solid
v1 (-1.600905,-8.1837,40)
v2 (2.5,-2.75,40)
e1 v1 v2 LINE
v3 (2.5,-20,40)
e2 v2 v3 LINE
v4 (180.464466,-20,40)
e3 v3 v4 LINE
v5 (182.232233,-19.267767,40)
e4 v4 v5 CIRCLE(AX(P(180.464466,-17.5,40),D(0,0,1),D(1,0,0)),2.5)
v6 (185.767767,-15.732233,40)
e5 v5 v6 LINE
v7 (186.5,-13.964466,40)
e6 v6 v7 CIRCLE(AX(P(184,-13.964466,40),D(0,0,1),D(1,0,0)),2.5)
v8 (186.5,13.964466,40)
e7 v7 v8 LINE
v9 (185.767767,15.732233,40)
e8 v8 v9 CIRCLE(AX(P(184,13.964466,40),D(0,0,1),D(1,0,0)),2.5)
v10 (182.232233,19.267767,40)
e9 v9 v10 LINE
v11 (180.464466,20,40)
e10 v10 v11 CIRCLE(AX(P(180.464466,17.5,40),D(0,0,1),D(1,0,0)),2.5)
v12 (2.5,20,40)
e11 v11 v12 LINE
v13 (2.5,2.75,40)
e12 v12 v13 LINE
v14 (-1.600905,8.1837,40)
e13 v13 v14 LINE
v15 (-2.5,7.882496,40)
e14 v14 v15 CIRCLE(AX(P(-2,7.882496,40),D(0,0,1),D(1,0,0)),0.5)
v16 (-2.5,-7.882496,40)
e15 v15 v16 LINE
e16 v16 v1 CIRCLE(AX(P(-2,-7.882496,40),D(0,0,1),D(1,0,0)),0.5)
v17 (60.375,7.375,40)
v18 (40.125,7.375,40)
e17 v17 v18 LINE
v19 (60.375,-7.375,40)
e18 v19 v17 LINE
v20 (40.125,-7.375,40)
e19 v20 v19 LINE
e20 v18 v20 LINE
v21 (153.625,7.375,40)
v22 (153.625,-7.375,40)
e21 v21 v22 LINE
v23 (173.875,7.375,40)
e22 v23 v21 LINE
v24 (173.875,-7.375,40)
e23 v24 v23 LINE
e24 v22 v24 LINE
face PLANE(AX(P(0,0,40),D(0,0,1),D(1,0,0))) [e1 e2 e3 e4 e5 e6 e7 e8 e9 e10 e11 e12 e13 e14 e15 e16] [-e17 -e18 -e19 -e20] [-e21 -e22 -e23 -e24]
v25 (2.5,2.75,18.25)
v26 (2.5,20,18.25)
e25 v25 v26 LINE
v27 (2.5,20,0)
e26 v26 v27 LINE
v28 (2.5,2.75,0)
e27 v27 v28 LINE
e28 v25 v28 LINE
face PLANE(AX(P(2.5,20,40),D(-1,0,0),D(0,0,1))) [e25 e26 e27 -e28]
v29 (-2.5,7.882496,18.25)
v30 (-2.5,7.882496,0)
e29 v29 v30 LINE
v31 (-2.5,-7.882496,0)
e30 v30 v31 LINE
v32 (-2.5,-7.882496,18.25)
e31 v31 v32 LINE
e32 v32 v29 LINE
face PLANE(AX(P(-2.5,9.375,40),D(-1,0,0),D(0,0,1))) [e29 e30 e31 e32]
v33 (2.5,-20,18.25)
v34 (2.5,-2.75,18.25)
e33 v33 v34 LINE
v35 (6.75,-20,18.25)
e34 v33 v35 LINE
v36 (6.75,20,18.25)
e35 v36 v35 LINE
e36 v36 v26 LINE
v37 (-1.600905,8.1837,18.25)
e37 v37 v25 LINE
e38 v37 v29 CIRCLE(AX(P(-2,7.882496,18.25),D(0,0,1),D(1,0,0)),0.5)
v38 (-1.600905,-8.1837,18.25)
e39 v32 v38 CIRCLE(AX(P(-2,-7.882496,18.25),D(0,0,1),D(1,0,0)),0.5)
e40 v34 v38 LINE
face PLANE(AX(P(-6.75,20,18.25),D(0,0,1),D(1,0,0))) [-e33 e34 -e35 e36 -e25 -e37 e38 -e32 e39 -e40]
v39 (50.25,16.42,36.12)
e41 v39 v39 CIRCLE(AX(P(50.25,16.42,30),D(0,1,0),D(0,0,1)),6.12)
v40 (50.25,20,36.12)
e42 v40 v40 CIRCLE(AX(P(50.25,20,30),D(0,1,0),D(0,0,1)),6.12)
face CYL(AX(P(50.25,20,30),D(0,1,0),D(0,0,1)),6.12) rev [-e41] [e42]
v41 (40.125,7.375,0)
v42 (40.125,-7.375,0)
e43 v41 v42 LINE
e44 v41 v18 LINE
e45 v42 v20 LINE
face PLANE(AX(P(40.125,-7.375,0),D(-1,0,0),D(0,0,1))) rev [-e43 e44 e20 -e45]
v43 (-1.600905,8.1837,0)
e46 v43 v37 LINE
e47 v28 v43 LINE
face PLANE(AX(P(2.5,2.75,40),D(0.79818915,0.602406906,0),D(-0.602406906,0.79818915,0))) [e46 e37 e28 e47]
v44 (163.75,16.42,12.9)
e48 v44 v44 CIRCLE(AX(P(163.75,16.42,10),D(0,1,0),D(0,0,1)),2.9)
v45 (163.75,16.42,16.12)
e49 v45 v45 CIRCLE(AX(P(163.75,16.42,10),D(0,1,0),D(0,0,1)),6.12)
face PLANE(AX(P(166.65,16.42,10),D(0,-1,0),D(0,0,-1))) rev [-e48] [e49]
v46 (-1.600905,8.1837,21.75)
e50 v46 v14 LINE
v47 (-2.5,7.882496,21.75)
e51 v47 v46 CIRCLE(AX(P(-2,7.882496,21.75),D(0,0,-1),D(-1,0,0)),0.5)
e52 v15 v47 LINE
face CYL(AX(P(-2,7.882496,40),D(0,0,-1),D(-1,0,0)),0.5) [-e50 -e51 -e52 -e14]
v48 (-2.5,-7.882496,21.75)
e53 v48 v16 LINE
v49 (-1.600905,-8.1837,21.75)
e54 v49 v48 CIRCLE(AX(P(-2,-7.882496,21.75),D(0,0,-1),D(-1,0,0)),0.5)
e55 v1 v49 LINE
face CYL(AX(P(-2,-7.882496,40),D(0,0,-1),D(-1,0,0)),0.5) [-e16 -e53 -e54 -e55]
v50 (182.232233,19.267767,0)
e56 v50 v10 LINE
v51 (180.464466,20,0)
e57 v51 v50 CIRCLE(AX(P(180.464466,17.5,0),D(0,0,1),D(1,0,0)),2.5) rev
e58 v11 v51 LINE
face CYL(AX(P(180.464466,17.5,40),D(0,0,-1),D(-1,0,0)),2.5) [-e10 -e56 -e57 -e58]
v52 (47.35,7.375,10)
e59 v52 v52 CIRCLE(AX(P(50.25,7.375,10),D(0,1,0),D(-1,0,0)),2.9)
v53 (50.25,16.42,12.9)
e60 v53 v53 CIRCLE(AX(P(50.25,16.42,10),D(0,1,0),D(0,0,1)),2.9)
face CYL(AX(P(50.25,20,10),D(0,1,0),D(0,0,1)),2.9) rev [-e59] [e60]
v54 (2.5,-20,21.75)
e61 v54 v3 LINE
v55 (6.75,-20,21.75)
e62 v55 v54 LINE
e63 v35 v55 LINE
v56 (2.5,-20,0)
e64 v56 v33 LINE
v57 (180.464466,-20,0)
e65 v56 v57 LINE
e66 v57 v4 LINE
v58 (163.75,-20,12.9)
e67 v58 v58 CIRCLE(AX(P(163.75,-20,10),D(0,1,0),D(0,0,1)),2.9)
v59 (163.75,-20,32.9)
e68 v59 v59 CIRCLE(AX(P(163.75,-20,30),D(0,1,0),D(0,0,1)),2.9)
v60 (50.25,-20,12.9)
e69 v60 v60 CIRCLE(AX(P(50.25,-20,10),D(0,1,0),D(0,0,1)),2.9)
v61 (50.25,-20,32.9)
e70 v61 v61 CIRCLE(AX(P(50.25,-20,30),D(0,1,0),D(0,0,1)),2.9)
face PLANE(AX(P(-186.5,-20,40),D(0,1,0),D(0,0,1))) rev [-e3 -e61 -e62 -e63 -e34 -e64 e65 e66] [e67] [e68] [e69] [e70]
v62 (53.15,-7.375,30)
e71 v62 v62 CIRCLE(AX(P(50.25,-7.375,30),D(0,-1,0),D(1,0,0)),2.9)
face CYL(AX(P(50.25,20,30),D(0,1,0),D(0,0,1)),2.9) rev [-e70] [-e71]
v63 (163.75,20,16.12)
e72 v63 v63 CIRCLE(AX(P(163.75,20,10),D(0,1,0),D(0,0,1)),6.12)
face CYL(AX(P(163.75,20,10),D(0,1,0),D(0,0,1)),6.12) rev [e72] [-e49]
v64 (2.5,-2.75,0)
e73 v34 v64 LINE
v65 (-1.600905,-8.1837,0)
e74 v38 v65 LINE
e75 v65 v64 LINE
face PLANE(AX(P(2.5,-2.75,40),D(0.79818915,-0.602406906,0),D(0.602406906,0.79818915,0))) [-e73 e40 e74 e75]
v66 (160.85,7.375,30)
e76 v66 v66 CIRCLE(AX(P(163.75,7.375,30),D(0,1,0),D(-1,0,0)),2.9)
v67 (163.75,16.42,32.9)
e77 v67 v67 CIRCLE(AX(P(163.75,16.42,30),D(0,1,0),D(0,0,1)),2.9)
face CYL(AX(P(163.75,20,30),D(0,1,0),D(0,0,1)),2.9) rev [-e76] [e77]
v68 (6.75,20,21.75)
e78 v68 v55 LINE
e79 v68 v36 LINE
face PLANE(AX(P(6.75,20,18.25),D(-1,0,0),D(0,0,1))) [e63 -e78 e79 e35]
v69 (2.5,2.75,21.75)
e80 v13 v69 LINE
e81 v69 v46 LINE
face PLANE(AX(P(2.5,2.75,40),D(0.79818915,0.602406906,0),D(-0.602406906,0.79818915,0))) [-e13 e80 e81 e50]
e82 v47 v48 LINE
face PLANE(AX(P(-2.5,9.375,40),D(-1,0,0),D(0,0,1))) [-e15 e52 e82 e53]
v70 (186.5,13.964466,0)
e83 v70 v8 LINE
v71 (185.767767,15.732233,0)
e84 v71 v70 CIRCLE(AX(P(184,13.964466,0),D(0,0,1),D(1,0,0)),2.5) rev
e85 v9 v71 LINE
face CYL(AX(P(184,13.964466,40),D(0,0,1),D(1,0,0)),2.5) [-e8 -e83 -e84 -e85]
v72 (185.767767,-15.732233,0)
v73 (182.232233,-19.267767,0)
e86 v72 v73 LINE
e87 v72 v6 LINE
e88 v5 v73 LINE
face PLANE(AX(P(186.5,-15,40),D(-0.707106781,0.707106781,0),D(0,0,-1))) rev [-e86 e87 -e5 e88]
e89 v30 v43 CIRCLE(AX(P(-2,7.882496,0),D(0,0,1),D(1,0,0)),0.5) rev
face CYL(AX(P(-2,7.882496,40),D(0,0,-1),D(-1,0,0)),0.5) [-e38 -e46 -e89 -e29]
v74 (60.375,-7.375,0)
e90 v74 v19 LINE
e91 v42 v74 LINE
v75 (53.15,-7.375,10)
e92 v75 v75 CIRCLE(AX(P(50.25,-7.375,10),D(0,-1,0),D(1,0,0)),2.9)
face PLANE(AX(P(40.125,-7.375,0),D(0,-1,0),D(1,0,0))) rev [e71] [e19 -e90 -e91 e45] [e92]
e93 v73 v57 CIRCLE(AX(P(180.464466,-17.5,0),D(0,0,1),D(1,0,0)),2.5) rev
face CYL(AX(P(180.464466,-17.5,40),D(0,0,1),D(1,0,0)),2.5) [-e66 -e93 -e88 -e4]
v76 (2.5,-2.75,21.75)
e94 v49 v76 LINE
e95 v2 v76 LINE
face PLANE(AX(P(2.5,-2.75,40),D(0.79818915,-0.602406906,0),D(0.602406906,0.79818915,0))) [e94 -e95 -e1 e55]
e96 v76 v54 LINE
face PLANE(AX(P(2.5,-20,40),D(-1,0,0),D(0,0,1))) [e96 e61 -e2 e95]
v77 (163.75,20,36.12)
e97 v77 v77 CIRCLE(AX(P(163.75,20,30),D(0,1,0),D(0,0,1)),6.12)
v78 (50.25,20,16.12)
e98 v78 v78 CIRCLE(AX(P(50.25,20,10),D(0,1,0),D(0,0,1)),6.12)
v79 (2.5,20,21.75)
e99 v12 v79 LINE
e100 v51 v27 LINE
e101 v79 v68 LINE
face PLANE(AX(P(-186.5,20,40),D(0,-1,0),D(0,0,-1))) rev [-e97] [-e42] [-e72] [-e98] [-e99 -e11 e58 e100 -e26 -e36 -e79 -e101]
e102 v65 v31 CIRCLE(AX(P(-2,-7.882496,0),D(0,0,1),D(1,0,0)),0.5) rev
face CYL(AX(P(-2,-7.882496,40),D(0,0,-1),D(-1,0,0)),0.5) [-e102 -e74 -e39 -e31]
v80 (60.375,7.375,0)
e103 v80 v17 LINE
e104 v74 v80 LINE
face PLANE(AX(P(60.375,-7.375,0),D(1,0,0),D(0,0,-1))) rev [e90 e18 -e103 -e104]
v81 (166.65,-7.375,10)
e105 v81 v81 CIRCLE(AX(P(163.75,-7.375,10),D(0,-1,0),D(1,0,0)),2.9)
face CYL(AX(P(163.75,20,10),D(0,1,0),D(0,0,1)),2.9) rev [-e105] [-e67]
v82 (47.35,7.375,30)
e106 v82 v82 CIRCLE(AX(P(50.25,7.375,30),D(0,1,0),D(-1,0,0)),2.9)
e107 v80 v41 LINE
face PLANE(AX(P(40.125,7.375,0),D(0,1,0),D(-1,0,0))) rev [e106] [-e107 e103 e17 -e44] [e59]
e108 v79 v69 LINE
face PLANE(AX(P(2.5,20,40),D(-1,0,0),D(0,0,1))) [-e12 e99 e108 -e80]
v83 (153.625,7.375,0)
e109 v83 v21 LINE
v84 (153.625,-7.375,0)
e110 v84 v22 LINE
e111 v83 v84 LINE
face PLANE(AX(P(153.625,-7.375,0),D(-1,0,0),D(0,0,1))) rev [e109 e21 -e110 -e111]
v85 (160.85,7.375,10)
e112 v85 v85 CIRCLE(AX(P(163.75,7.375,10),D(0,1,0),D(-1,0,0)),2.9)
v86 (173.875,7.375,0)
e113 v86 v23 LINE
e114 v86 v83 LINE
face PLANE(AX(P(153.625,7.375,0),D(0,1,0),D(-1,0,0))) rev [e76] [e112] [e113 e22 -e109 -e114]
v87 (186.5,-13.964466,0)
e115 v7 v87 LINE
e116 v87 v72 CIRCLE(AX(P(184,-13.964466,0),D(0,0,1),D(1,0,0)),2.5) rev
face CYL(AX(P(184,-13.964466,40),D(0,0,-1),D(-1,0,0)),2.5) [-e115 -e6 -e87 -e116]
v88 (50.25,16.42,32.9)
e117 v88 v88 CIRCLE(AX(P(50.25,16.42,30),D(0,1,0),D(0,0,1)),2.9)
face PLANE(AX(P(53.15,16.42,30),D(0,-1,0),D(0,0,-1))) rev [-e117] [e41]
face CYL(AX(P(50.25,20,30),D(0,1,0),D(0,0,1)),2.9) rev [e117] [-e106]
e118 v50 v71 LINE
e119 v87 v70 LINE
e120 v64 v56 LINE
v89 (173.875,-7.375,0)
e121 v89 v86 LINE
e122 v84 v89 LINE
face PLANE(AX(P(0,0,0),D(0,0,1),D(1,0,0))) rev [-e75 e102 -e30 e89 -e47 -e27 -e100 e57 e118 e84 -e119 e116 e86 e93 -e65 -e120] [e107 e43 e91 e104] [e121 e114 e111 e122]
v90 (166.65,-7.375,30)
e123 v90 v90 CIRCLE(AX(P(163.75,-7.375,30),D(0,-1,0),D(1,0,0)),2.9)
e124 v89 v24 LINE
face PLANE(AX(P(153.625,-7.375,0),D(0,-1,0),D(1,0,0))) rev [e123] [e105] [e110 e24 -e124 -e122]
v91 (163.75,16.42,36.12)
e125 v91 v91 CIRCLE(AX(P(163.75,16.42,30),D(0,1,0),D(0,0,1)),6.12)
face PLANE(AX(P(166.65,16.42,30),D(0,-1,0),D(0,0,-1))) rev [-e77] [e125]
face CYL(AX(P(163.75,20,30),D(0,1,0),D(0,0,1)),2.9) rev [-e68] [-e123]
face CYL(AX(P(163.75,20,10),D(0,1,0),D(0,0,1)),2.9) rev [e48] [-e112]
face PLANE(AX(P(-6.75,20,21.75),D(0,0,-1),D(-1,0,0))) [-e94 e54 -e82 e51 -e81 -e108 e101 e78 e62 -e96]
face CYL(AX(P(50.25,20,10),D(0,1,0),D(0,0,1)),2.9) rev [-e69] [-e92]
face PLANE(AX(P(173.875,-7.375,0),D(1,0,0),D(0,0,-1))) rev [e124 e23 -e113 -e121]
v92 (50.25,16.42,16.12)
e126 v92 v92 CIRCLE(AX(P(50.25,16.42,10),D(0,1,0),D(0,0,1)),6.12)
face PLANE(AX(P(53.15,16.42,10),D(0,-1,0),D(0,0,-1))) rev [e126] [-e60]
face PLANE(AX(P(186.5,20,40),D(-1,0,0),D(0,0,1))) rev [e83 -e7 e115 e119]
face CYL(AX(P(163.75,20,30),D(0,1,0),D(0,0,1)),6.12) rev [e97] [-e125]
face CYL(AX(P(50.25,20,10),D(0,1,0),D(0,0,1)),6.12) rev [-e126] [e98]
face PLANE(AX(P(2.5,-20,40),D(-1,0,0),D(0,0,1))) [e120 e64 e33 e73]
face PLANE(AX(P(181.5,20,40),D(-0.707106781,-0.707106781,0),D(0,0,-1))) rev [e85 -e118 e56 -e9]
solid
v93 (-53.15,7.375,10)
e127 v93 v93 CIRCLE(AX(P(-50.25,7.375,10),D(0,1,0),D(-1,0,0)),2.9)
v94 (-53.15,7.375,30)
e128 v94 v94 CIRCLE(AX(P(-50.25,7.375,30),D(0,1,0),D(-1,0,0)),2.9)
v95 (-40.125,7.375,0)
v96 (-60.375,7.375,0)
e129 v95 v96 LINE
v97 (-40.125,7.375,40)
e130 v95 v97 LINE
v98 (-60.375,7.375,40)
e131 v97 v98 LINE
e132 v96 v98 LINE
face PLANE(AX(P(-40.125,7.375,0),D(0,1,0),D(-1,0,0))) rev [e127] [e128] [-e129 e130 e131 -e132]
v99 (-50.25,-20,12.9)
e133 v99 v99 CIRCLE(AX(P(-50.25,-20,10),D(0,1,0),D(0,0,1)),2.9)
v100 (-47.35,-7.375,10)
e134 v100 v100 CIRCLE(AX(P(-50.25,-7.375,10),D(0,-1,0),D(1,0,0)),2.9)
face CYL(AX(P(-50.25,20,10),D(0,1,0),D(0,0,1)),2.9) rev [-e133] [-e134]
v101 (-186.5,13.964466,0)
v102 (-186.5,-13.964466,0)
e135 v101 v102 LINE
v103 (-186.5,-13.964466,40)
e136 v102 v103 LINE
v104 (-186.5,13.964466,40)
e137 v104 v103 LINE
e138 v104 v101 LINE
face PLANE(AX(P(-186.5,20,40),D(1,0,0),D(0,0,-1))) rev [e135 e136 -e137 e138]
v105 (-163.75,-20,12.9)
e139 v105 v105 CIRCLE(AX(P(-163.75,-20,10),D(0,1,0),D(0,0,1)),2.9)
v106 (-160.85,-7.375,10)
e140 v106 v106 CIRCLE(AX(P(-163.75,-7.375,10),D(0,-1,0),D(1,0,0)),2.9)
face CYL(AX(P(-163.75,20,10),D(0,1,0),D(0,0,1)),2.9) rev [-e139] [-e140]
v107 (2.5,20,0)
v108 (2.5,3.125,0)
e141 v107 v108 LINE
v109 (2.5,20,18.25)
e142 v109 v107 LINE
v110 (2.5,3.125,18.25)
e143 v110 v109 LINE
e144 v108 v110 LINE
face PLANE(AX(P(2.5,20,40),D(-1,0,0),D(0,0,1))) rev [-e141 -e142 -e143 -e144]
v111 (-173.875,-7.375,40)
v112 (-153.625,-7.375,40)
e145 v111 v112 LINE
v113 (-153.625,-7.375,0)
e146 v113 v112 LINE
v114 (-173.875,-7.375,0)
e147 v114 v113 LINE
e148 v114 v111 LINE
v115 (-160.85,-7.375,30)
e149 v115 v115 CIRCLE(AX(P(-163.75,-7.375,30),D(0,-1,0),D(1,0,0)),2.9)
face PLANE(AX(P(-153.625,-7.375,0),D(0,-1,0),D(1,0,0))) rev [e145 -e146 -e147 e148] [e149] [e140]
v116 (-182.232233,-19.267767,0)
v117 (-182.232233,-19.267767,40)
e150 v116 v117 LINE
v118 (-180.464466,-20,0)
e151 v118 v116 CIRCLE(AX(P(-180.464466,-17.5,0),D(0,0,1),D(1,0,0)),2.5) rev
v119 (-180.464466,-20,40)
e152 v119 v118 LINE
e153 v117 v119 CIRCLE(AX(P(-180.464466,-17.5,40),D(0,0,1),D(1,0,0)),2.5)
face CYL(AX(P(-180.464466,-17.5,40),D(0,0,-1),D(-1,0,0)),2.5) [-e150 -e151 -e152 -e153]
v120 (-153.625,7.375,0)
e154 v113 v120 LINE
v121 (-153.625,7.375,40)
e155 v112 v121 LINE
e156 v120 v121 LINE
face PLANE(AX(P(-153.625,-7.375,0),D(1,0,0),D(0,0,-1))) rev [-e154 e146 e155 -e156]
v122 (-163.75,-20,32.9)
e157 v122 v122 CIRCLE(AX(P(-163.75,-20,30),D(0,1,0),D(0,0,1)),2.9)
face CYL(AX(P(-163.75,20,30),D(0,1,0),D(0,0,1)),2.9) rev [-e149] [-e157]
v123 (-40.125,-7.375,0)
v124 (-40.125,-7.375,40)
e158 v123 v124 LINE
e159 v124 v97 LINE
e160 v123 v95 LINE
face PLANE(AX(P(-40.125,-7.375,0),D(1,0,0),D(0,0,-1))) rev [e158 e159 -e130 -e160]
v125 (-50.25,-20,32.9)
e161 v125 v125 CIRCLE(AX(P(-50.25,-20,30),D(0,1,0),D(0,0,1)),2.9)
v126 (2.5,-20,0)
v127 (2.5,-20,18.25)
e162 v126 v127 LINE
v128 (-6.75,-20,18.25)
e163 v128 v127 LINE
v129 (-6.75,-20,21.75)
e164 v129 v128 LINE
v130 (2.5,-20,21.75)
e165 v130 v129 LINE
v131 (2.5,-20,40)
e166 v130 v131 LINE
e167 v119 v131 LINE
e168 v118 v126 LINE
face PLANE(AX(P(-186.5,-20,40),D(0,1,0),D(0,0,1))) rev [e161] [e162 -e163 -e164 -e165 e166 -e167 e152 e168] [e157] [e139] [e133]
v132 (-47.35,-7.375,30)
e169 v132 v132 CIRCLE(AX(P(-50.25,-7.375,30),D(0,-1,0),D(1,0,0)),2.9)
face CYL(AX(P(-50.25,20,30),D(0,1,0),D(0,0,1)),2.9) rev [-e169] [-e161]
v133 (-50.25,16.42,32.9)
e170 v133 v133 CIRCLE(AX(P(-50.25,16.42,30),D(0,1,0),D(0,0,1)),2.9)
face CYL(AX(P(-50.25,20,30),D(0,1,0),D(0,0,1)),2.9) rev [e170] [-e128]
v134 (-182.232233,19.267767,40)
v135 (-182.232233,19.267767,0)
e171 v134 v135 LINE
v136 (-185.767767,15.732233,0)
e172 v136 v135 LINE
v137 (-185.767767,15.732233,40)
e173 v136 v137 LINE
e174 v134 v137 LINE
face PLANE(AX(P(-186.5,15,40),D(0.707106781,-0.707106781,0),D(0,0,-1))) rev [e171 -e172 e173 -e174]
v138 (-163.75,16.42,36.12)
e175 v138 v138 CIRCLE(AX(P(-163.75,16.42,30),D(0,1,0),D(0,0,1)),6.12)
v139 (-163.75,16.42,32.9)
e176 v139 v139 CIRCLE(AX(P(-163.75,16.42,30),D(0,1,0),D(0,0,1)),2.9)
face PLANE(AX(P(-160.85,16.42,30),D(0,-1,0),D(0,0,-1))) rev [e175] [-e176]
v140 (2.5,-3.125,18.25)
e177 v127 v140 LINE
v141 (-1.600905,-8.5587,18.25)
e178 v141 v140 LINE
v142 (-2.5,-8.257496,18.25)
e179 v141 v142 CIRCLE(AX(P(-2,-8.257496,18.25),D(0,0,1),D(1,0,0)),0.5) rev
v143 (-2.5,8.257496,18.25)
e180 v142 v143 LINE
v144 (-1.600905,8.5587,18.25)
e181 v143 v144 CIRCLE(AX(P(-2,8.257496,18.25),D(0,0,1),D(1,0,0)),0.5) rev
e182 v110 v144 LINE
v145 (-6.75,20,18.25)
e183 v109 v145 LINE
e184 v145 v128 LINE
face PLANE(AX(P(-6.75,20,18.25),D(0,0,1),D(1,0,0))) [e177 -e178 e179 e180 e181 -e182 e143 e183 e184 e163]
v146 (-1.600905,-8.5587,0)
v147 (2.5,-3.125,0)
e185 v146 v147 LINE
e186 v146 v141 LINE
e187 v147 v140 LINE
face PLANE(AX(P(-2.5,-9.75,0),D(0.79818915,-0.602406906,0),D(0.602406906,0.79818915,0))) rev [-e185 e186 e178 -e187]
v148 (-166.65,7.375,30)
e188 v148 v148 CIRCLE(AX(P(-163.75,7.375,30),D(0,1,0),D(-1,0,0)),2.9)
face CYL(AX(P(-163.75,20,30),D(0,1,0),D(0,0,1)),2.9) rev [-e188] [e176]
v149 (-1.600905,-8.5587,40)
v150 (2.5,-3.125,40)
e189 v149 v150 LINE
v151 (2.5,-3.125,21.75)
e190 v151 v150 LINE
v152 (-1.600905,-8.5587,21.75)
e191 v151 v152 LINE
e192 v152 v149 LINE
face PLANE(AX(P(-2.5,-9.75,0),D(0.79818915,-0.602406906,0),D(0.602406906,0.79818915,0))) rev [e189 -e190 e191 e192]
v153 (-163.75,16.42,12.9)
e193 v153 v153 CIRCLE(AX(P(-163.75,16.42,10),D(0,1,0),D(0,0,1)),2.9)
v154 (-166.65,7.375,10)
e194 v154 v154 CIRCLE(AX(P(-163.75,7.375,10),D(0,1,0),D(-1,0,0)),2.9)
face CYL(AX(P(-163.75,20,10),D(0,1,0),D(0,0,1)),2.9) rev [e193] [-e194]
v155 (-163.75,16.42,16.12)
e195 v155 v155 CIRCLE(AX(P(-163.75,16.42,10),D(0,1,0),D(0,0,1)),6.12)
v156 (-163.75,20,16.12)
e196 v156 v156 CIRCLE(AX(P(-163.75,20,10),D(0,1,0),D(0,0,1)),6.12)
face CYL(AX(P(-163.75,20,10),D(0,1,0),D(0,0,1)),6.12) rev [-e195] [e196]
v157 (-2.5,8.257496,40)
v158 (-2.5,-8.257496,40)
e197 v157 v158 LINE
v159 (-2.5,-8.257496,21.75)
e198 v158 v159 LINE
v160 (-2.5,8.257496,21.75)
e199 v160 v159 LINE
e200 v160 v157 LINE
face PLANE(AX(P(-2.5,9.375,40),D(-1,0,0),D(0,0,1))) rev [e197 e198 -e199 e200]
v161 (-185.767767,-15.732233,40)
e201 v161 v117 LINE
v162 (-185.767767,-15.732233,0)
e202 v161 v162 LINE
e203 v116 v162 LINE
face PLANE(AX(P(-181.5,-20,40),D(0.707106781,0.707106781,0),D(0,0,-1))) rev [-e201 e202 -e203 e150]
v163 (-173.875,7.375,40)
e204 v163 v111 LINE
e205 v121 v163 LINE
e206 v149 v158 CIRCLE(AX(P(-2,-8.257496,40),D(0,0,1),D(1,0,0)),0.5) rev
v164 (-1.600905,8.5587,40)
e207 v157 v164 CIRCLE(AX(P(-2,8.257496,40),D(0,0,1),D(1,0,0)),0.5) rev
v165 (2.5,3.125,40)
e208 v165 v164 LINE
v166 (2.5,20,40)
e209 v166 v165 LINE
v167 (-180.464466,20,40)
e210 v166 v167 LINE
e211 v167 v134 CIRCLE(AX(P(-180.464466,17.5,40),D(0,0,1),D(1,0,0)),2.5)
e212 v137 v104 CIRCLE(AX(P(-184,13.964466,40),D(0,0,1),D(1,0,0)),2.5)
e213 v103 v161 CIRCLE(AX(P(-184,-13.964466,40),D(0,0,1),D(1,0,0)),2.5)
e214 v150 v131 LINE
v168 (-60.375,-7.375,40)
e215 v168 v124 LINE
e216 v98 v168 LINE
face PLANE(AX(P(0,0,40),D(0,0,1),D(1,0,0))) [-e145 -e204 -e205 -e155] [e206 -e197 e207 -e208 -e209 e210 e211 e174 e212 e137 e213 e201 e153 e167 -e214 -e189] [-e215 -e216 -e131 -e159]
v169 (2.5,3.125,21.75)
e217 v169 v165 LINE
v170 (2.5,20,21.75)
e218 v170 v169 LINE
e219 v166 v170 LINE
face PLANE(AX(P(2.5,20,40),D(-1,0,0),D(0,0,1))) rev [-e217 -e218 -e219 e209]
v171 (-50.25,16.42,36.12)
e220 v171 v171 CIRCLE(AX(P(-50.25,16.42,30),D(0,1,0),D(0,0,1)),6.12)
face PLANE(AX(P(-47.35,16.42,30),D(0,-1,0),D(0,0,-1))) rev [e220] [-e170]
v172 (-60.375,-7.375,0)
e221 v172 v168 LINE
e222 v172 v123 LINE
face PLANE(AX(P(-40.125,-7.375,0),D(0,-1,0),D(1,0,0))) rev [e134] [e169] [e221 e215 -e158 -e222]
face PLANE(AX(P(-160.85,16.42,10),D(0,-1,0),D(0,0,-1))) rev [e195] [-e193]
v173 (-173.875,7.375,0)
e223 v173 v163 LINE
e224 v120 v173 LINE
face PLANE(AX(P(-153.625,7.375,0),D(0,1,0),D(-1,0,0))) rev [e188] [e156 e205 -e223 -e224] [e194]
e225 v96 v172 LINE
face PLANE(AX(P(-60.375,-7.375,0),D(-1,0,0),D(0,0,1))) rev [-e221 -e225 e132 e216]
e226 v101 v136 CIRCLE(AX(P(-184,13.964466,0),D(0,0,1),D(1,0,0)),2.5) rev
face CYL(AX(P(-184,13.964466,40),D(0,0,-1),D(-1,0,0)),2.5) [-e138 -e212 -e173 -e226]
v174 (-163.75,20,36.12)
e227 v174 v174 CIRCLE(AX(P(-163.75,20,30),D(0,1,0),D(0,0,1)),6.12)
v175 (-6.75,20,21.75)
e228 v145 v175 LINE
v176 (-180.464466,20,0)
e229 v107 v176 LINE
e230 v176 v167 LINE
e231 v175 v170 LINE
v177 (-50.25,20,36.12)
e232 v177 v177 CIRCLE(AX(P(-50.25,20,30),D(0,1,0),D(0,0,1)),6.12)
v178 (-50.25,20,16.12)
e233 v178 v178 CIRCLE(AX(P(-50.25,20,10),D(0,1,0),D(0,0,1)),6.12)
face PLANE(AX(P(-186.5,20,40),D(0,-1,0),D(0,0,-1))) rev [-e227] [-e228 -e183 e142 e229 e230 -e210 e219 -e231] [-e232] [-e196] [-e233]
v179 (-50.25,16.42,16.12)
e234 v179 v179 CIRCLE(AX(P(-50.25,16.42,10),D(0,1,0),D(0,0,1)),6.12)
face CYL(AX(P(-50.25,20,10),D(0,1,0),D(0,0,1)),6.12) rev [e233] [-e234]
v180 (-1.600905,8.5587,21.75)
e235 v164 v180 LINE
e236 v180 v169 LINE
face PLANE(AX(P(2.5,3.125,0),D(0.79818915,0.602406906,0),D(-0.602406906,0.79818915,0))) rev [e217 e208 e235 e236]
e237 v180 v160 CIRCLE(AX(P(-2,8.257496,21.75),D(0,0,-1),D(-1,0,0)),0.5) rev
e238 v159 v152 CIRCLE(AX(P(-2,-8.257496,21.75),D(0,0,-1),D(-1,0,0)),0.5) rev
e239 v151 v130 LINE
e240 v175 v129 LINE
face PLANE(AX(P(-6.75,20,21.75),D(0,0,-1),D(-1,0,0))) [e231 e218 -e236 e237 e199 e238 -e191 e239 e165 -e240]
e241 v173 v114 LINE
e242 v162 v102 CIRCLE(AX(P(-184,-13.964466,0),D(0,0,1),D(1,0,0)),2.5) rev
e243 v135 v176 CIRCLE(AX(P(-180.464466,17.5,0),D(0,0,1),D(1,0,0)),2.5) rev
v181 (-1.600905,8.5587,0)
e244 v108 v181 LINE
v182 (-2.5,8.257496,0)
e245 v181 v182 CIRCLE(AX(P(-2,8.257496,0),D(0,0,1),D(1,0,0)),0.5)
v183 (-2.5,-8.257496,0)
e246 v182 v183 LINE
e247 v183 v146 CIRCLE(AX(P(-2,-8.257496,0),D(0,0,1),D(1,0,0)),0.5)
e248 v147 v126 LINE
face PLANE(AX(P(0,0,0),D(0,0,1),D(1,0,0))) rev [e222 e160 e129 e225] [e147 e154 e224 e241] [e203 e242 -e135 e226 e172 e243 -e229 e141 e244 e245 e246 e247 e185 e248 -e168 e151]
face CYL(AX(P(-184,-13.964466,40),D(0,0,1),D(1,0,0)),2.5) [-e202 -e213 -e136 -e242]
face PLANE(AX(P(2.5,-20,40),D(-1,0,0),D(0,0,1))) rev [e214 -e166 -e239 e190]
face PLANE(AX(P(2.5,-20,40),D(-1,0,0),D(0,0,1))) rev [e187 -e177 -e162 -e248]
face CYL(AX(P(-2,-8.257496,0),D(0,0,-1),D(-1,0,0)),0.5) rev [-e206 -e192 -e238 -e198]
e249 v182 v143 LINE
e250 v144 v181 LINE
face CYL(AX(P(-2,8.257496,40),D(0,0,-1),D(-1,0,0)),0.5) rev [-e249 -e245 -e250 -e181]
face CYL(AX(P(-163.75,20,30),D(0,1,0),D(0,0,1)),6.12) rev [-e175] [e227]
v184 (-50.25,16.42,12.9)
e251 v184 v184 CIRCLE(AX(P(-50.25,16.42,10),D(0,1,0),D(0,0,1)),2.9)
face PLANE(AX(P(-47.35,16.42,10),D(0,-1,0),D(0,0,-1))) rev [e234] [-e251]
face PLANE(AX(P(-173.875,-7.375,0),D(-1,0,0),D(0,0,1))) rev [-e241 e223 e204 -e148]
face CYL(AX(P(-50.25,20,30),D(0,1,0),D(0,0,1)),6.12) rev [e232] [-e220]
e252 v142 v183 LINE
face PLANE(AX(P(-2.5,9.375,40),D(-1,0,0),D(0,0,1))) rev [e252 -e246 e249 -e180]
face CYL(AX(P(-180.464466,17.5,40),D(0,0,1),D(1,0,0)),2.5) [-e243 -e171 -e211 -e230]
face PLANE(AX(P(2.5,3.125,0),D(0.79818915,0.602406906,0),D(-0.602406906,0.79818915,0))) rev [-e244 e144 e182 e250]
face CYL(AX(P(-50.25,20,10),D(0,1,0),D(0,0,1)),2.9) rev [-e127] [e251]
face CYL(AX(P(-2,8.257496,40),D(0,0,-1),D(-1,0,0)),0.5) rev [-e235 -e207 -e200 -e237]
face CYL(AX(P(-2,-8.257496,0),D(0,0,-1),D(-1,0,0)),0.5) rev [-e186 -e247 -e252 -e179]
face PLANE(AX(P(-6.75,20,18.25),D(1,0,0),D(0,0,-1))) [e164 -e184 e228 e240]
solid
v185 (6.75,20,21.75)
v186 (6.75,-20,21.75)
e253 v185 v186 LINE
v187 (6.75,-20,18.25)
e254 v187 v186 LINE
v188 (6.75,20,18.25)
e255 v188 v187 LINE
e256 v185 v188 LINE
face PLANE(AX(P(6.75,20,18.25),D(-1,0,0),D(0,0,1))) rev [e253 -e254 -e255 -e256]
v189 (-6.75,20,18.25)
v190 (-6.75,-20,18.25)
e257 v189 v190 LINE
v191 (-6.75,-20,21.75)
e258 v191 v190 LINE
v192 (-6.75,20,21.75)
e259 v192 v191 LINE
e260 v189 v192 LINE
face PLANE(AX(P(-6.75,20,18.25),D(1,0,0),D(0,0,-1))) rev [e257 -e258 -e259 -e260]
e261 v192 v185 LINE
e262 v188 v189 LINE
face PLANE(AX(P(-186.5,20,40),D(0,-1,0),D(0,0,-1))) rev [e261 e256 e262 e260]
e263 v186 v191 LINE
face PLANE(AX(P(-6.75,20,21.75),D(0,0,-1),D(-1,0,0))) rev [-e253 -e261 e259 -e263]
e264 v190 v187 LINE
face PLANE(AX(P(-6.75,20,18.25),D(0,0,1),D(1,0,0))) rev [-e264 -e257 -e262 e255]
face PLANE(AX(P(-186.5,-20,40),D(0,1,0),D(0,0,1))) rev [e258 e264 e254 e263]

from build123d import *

# Parameters (mm, degrees)
SKETCH2_W                               = 373
SKETCH2_H                               = 40
BOSS_EXTRUDE1_DEPTH                     = 40
SKETCH3_W                               = 20.25
SKETCH3_H                               = 14.75
CUT_EXTRUDE1_DEPTH                      = 192.786991217
CHAMFER1_SIZE                           = 5
FILLET1_R                               = 2.5
CBORE_FOR_M5_HEX_HEAD_BOLT1_D           = 5.8
CBORE_FOR_M5_HEX_HEAD_BOLT1_CBORE_D     = 12.24
CBORE_FOR_M5_HEX_HEAD_BOLT1_CBORE_DEPTH = 3.58
LPATTERN1_COUNT                         = 2
LPATTERN1_PITCH                         = 113.5
MIRROR1_COPY_1_D                        = 5.8
MIRROR1_COPY_1_CBORE_D                  = 12.24
MIRROR1_COPY_1_CBORE_DEPTH              = 3.58
MIRROR2_COPY_1_D                        = 5.8
MIRROR2_COPY_1_CBORE_D                  = 12.24
MIRROR2_COPY_1_CBORE_DEPTH              = 3.58
MIRROR2_COPY_2_D                        = 5.8
MIRROR2_COPY_2_CBORE_D                  = 12.24
MIRROR2_COPY_2_CBORE_DEPTH              = 3.58
MIRROR2_COPY_3_D                        = 5.8
MIRROR2_COPY_3_CBORE_D                  = 12.24
MIRROR2_COPY_3_CBORE_DEPTH              = 3.58
SPLIT1_OUTLINE_W                        = 20.25
SPLIT1_OUTLINE_H                        = 14.75
SPLIT1_DEPTH                            = 40
SPLIT1_START                            = 18.25
SPLIT1_2_DEPTH                          = 3.5
SPLIT1_START_2                          = -20
SPLIT1_3_OUTLINE_W                      = 93.25
SPLIT1_3_OUTLINE_H                      = 40
SPLIT1_3_OUTLINE_W_2                    = 12.625
SPLIT1_3_DEPTH                          = 40
SPLIT1_4_OUTLINE_W                      = 5
SPLIT1_4_OUTLINE_H                      = 18.25
SPLIT1_4_OUTLINE_W_2                    = 20.25
SPLIT1_4_OUTLINE_H_2                    = 40
SPLIT1_4_OUTLINE_R                      = 2.9
SPLIT1_4_DEPTH                          = 12.625
SPLIT1_START_3                          = 7.375
SPLIT1_5_OUTLINE_W                      = 5
SPLIT1_5_OUTLINE_H                      = 18.25
SPLIT1_5_OUTLINE_W_2                    = 20.25
SPLIT1_5_OUTLINE_H_2                    = 40
SPLIT1_5_OUTLINE_R                      = 6.12
SPLIT1_5_DEPTH                          = 12.625
SPLIT1_6_OUTLINE_R                      = 6.12
SPLIT1_6_OUTLINE_R_2                    = 2.9
SPLIT1_6_DEPTH                          = 9.045
SPLIT1_START_4                          = -7.375
SPLIT1_7_OUTLINE_W                      = 5
SPLIT1_7_OUTLINE_H                      = 18.25
SPLIT1_7_DEPTH                          = 4.625
SPLIT1_START_5                          = 2.75
SPLIT1_8_OUTLINE_W                      = 5
SPLIT1_8_OUTLINE_H                      = 18.25
SPLIT1_8_DEPTH                          = 4.625
SPLIT1_START_6                          = -1
SPLIT1_9_DEPTH                          = 42
SPLIT1_10_DEPTH                         = 3.5
SPLIT1_11_DEPTH                         = 3.5
CUT_EXTRUDE3_DEPTH                      = 192.786991217
FILLET2_R                               = 0.5
FILLET3_R                               = 0.5


with BuildPart() as part:
    # Sketch2 → Boss-Extrude1 (new body)
    with BuildSketch(Plane.XY):
        Rectangle(SKETCH2_W, SKETCH2_H)
    extrude(amount=BOSS_EXTRUDE1_DEPTH)

    # Sketch3 → Cut-Extrude1 (cut, through all)
    with BuildSketch(Plane.XY.offset(40)):
        with Locations((-163.75, 0)):
            Rectangle(SKETCH3_W, SKETCH3_H)
        with Locations((-50.25, 0)):
            Rectangle(SKETCH3_W, SKETCH3_H)
        with Locations((50.25, 0)):
            Rectangle(SKETCH3_W, SKETCH3_H)
        with Locations((163.75, 0)):
            Rectangle(SKETCH3_W, SKETCH3_H)
    extrude(amount=-CUT_EXTRUDE1_DEPTH, mode=Mode.SUBTRACT)

    # Chamfer1
    chamfer1_edges = [part.edges().sort_by_distance(p)[0] for p in [
        (186.5, -20, 20),
        (-186.5, -20, 20),
        (-186.5, 20, 20),
        (186.5, 20, 20),
    ]]
    chamfer(chamfer1_edges, length=CHAMFER1_SIZE)

    # Fillet1
    fillet1_edges = [part.edges().sort_by_distance(p)[0] for p in [
        (-181.5, 20, 20),
        (181.5, 20, 20),
        (186.5, -15, 20),
        (186.5, 15, 20),
        (-181.5, -20, 20),
        (181.5, -20, 20),
        (-186.5, 15, 20),
        (-186.5, -15, 20),
    ]]
    fillet(fillet1_edges, radius=FILLET1_R)

    # CBORE for M5 Hex Head Bolt1 (through all)
    with Locations(Plane(origin=(0, 20, 0), x_dir=(1, 0, 0), z_dir=(0, 1, 0))):
        with Locations((-163.75, -10)):
            cbore_for_m5_hex_head_bolt1 = CounterBoreHole(CBORE_FOR_M5_HEX_HEAD_BOLT1_D / 2, CBORE_FOR_M5_HEX_HEAD_BOLT1_CBORE_D / 2, CBORE_FOR_M5_HEX_HEAD_BOLT1_CBORE_DEPTH)

    # LPattern1: CBORE for M5 Hex Head Bolt1 ×2
    with Locations(*[(i * LPATTERN1_PITCH, 0, 0) for i in range(1, LPATTERN1_COUNT)]):
        add(cbore_for_m5_hex_head_bolt1, mode=Mode.SUBTRACT)

    # Mirror1: CBORE for M5 Hex Head Bolt1 across plane
    add(cbore_for_m5_hex_head_bolt1.mirror(Plane(origin=(0, 0, 0), x_dir=(0, 0, 1), z_dir=(1, 0, 0))), mode=Mode.SUBTRACT)

    # Mirror1 copy 1 (through all)
    with Locations(Plane(origin=(-113.5, 20, 0), x_dir=(-1, 0, 0), z_dir=(0, 1, 0))):
        with Locations((-163.75, 10)):
            CounterBoreHole(MIRROR1_COPY_1_D / 2, MIRROR1_COPY_1_CBORE_D / 2, MIRROR1_COPY_1_CBORE_DEPTH)

    # Mirror2: CBORE for M5 Hex Head Bolt1 across plane
    add(cbore_for_m5_hex_head_bolt1.mirror(Plane.XY.offset(20)), mode=Mode.SUBTRACT)

    # Mirror2 copy 1 (through all)
    with Locations(Plane(origin=(113.5, 20, 40), x_dir=(1, 0, 0), z_dir=(0, 1, 0))):
        with Locations((-163.75, 10)):
            CounterBoreHole(MIRROR2_COPY_1_D / 2, MIRROR2_COPY_1_CBORE_D / 2, MIRROR2_COPY_1_CBORE_DEPTH)

    # Mirror2 copy 2 (through all)
    with Locations(Plane(origin=(0, 20, 40), x_dir=(-1, 0, 0), z_dir=(0, 1, 0))):
        with Locations((-163.75, -10)):
            CounterBoreHole(MIRROR2_COPY_2_D / 2, MIRROR2_COPY_2_CBORE_D / 2, MIRROR2_COPY_2_CBORE_DEPTH)

    # Mirror2 copy 3 (through all)
    with Locations(Plane(origin=(-113.5, 20, 40), x_dir=(-1, 0, 0), z_dir=(0, 1, 0))):
        with Locations((-163.75, -10)):
            CounterBoreHole(MIRROR2_COPY_3_D / 2, MIRROR2_COPY_3_CBORE_D / 2, MIRROR2_COPY_3_CBORE_DEPTH)

    # Split1: read off the stored shape, not the designer's step
    # Split1 outline → Split1 (cut)
    with BuildSketch(Plane.XY):
        with BuildLine():
            Line((2.5, -20), (2.5, -2.75))
            Line((2.5, -2.75), (-2.5, -9.375))
            Line((-2.5, -9.375), (-2.5, 9.375))
            Line((-2.5, 9.375), (2.5, 2.75))
            Line((2.5, 2.75), (2.5, 20))
            Line((2.5, 20), (-180.464466094, 20))
            ThreePointArc((-180.464466094, 20), (-181.421174675, 19.809698831), (-182.232233047, 19.267766953))
            Line((-182.232233047, 19.267766953), (-185.767766953, 15.732233047))
            ThreePointArc((-185.767766953, 15.732233047), (-186.309698831, 14.921174675), (-186.5, 13.964466094))
            Line((-186.5, 13.964466094), (-186.5, -13.964466094))
            ThreePointArc((-186.5, -13.964466094), (-186.309698831, -14.921174675), (-185.767766953, -15.732233047))
            Line((-185.767766953, -15.732233047), (-182.232233047, -19.267766953))
            ThreePointArc((-182.232233047, -19.267766953), (-181.421174675, -19.809698831), (-180.464466094, -20))
            Line((-180.464466094, -20), (2.5, -20))
        make_face()
        with Locations((-163.75, 0)):
            Rectangle(SPLIT1_OUTLINE_W, SPLIT1_OUTLINE_H, mode=Mode.SUBTRACT)
        with Locations((-50.25, 0)):
            Rectangle(SPLIT1_OUTLINE_W, SPLIT1_OUTLINE_H, mode=Mode.SUBTRACT)
    extrude(amount=SPLIT1_DEPTH, mode=Mode.SUBTRACT)

    # Split1 2 outline → Split1 2 (cut)
    with BuildSketch(Plane.XY.offset(SPLIT1_START)):
        Polygon((-2.5, -9.375), (2.5, -2.75), (2.5, -20), (6.75, -20), (6.75, 20), (2.5, 20), (2.5, 2.75), (-2.5, 9.375), align=None)
    extrude(amount=SPLIT1_2_DEPTH, mode=Mode.SUBTRACT)

    # Fillet2
    fillet2_edges = [part.edges().sort_by_distance(p)[0] for p in [
        (-2.5, -9.375, 9.125),
        (-2.5, -9.375, 30.875),
        (-2.5, 9.375, 9.125),
        (-2.5, 9.375, 30.875),
    ]]
    fillet(fillet2_edges, radius=FILLET2_R)


with BuildPart() as body_2:
    # Split1 3 outline → Split1 3 (new body)
    with BuildSketch(Plane(origin=(0, 0, 0), x_dir=(1, 0, 0), z_dir=(0, 1, 0)).offset(SPLIT1_START_2)):
        Polygon((-2.5, -40), (-2.5, -21.75), (-6.75, -21.75), (-6.75, -18.25), (-2.5, -18.25), (-2.5, 0), (-40.125, 0), (-40.125, -40), align=None)
        with Locations((-107, -20)):
            Rectangle(SPLIT1_3_OUTLINE_W, SPLIT1_3_OUTLINE_H)
        with Locations((-180.1875, -20)):
            Rectangle(SPLIT1_3_OUTLINE_W_2, SPLIT1_3_OUTLINE_H)
    extrude(amount=SPLIT1_3_DEPTH)

    # Split1 4 outline → Split1 4 (add)
    # profile 1 of 4: a face of its own
    with BuildSketch(Plane(origin=(0, 0, 0), x_dir=(1, 0, 0), z_dir=(0, 1, 0)).offset(SPLIT1_START_2)):
        with Locations((0, -30.875)):
            Rectangle(SPLIT1_4_OUTLINE_W, SPLIT1_4_OUTLINE_H)
    # profile 2 of 4: a face of its own
    with BuildSketch(Plane(origin=(0, 0, 0), x_dir=(1, 0, 0), z_dir=(0, 1, 0)).offset(SPLIT1_START_2)):
        with Locations((-50.25, -20)):
            Rectangle(SPLIT1_4_OUTLINE_W_2, SPLIT1_4_OUTLINE_H_2)
        with Locations((-50.25, -30)):
            Circle(SPLIT1_4_OUTLINE_R, mode=Mode.SUBTRACT)
        with Locations((-50.25, -10)):
            Circle(SPLIT1_4_OUTLINE_R, mode=Mode.SUBTRACT)
    # profile 3 of 4: a face of its own
    with BuildSketch(Plane(origin=(0, 0, 0), x_dir=(1, 0, 0), z_dir=(0, 1, 0)).offset(SPLIT1_START_2)):
        with Locations((0, -9.125)):
            Rectangle(SPLIT1_4_OUTLINE_W, SPLIT1_4_OUTLINE_H)
    # profile 4 of 4: a face of its own
    with BuildSketch(Plane(origin=(0, 0, 0), x_dir=(1, 0, 0), z_dir=(0, 1, 0)).offset(SPLIT1_START_2)):
        with Locations((-163.75, -20)):
            Rectangle(SPLIT1_4_OUTLINE_W_2, SPLIT1_4_OUTLINE_H_2)
        with Locations((-163.75, -30)):
            Circle(SPLIT1_4_OUTLINE_R, mode=Mode.SUBTRACT)
        with Locations((-163.75, -10)):
            Circle(SPLIT1_4_OUTLINE_R, mode=Mode.SUBTRACT)
    extrude(amount=SPLIT1_4_DEPTH)

    # Split1 5 outline → Split1 5 (add)
    # profile 1 of 4: a face of its own
    with BuildSketch(Plane(origin=(0, 0, 0), x_dir=(1, 0, 0), z_dir=(0, 1, 0)).offset(SPLIT1_START_3)):
        with Locations((0, -30.875)):
            Rectangle(SPLIT1_5_OUTLINE_W, SPLIT1_5_OUTLINE_H)
    # profile 2 of 4: a face of its own
    with BuildSketch(Plane(origin=(0, 0, 0), x_dir=(1, 0, 0), z_dir=(0, 1, 0)).offset(SPLIT1_START_3)):
        with Locations((-50.25, -20)):
            Rectangle(SPLIT1_5_OUTLINE_W_2, SPLIT1_5_OUTLINE_H_2)
        with Locations((-50.25, -30)):
            Circle(SPLIT1_5_OUTLINE_R, mode=Mode.SUBTRACT)
        with Locations((-50.25, -10)):
            Circle(SPLIT1_5_OUTLINE_R, mode=Mode.SUBTRACT)
    # profile 3 of 4: a face of its own
    with BuildSketch(Plane(origin=(0, 0, 0), x_dir=(1, 0, 0), z_dir=(0, 1, 0)).offset(SPLIT1_START_3)):
        with Locations((0, -9.125)):
            Rectangle(SPLIT1_5_OUTLINE_W, SPLIT1_5_OUTLINE_H)
    # profile 4 of 4: a face of its own
    with BuildSketch(Plane(origin=(0, 0, 0), x_dir=(1, 0, 0), z_dir=(0, 1, 0)).offset(SPLIT1_START_3)):
        with Locations((-163.75, -20)):
            Rectangle(SPLIT1_5_OUTLINE_W_2, SPLIT1_5_OUTLINE_H_2)
        with Locations((-163.75, -30)):
            Circle(SPLIT1_5_OUTLINE_R, mode=Mode.SUBTRACT)
        with Locations((-163.75, -10)):
            Circle(SPLIT1_5_OUTLINE_R, mode=Mode.SUBTRACT)
    extrude(amount=SPLIT1_5_DEPTH)

    # Split1 6 outline → Split1 6 (add)
    # profile 1 of 4: a face of its own
    with BuildSketch(Plane(origin=(0, 0, 0), x_dir=(1, 0, 0), z_dir=(0, 1, 0)).offset(SPLIT1_START_3)):
        with Locations((-163.75, -10)):
            Circle(SPLIT1_6_OUTLINE_R)
        with Locations((-163.75, -10)):
            Circle(SPLIT1_6_OUTLINE_R_2, mode=Mode.SUBTRACT)
    # profile 2 of 4: a face of its own
    with BuildSketch(Plane(origin=(0, 0, 0), x_dir=(1, 0, 0), z_dir=(0, 1, 0)).offset(SPLIT1_START_3)):
        with Locations((-50.25, -10)):
            Circle(SPLIT1_6_OUTLINE_R)
        with Locations((-50.25, -10)):
            Circle(SPLIT1_6_OUTLINE_R_2, mode=Mode.SUBTRACT)
    # profile 3 of 4: a face of its own
    with BuildSketch(Plane(origin=(0, 0, 0), x_dir=(1, 0, 0), z_dir=(0, 1, 0)).offset(SPLIT1_START_3)):
        with Locations((-163.75, -30)):
            Circle(SPLIT1_6_OUTLINE_R)
        with Locations((-163.75, -30)):
            Circle(SPLIT1_6_OUTLINE_R_2, mode=Mode.SUBTRACT)
    # profile 4 of 4: a face of its own
    with BuildSketch(Plane(origin=(0, 0, 0), x_dir=(1, 0, 0), z_dir=(0, 1, 0)).offset(SPLIT1_START_3)):
        with Locations((-50.25, -30)):
            Circle(SPLIT1_6_OUTLINE_R)
        with Locations((-50.25, -30)):
            Circle(SPLIT1_6_OUTLINE_R_2, mode=Mode.SUBTRACT)
    extrude(amount=SPLIT1_6_DEPTH)

    # Split1 7 outline → Split1 7 (add)
    with BuildSketch(Plane(origin=(0, 0, 0), x_dir=(1, 0, 0), z_dir=(0, 1, 0)).offset(SPLIT1_START_4)):
        with Locations((0, -30.875)):
            Rectangle(SPLIT1_7_OUTLINE_W, SPLIT1_7_OUTLINE_H)
        with Locations((0, -9.125)):
            Rectangle(SPLIT1_7_OUTLINE_W, SPLIT1_7_OUTLINE_H)
    extrude(amount=SPLIT1_7_DEPTH)

    # Split1 8 outline → Split1 8 (add)
    with BuildSketch(Plane(origin=(0, 0, 0), x_dir=(1, 0, 0), z_dir=(0, 1, 0)).offset(SPLIT1_START_5)):
        with Locations((0, -30.875)):
            Rectangle(SPLIT1_8_OUTLINE_W, SPLIT1_8_OUTLINE_H)
        with Locations((0, -9.125)):
            Rectangle(SPLIT1_8_OUTLINE_W, SPLIT1_8_OUTLINE_H)
    extrude(amount=SPLIT1_8_DEPTH)

    # Split1 9 outline → Split1 9 (cut)
    with BuildSketch(Plane.XY.offset(SPLIT1_START_6)):
        Polygon((-2.5, -2.75), (-2.5, -9.375), (2.5, -2.75), align=None)
        Polygon((-2.5, 9.375), (-2.5, 2.75), (2.5, 2.75), align=None)
        with BuildLine():
            ThreePointArc((-185.767766953, -15.732233047), (-186.309698831, -14.921174675), (-186.5, -13.964466094))
            Line((-186.5, -13.964466094), (-186.5, -20))
            Line((-186.5, -20), (-180.464466094, -20))
            ThreePointArc((-180.464466094, -20), (-181.421174675, -19.809698831), (-182.232233047, -19.267766953))
            Line((-182.232233047, -19.267766953), (-185.767766953, -15.732233047))
        make_face()
        with BuildLine():
            ThreePointArc((-182.232233047, 19.267766953), (-181.421174675, 19.809698831), (-180.464466094, 20))
            Line((-180.464466094, 20), (-186.5, 20))
            Line((-186.5, 20), (-186.5, 13.964466094))
            ThreePointArc((-186.5, 13.964466094), (-186.309698831, 14.921174675), (-185.767766953, 15.732233047))
            Line((-185.767766953, 15.732233047), (-182.232233047, 19.267766953))
        make_face()
    extrude(amount=SPLIT1_9_DEPTH, mode=Mode.SUBTRACT)

    # Sketch9 → Cut-Extrude3 (cut, through all)
    with BuildSketch(Plane.XY.offset(40)):
        Polygon((-2.5, 9.75), (-2.5, -9.75), (2.5, -3.125), (2.5, 3.125), align=None)
    extrude(amount=-CUT_EXTRUDE3_DEPTH, mode=Mode.SUBTRACT)

    # Fillet3
    fillet3_edges = [body_2.edges().sort_by_distance(p)[0] for p in [
        (-2.5, 9.75, 9.125),
        (-2.5, 9.75, 30.875),
        (-2.5, -9.75, 30.875),
        (-2.5, -9.75, 9.125),
    ]]
    fillet(fillet3_edges, radius=FILLET3_R)


with BuildPart() as body_3:
    # Split1 10 outline → Split1 10 (new body)
    with BuildSketch(Plane.XY.offset(SPLIT1_START)):
        Polygon((2.5, -20), (2.5, -2.75), (-2.5, -9.375), (-2.5, 9.375), (2.5, 2.75), (2.5, 20), (-6.75, 20), (-6.75, -20), align=None)
    extrude(amount=SPLIT1_10_DEPTH)


with BuildPart() as body_4:
    # Split1 11 outline → Split1 11 (new body)
    with BuildSketch(Plane.XY.offset(SPLIT1_START)):
        Polygon((6.75, -20), (6.75, 20), (2.5, 20), (2.5, 2.75), (-2.5, 9.375), (-2.5, -9.375), (2.5, -2.75), (2.5, -20), align=None)
    extrude(amount=SPLIT1_11_DEPTH)


with BuildPart() as body_3_1:
    add(body_3.part)

    # Combine1: read off the stored shape, not the designer's step
    # Combine1: union body 4
    add(body_4.part)


solid = Compound([part.part, body_2.part, body_3_1.part])
